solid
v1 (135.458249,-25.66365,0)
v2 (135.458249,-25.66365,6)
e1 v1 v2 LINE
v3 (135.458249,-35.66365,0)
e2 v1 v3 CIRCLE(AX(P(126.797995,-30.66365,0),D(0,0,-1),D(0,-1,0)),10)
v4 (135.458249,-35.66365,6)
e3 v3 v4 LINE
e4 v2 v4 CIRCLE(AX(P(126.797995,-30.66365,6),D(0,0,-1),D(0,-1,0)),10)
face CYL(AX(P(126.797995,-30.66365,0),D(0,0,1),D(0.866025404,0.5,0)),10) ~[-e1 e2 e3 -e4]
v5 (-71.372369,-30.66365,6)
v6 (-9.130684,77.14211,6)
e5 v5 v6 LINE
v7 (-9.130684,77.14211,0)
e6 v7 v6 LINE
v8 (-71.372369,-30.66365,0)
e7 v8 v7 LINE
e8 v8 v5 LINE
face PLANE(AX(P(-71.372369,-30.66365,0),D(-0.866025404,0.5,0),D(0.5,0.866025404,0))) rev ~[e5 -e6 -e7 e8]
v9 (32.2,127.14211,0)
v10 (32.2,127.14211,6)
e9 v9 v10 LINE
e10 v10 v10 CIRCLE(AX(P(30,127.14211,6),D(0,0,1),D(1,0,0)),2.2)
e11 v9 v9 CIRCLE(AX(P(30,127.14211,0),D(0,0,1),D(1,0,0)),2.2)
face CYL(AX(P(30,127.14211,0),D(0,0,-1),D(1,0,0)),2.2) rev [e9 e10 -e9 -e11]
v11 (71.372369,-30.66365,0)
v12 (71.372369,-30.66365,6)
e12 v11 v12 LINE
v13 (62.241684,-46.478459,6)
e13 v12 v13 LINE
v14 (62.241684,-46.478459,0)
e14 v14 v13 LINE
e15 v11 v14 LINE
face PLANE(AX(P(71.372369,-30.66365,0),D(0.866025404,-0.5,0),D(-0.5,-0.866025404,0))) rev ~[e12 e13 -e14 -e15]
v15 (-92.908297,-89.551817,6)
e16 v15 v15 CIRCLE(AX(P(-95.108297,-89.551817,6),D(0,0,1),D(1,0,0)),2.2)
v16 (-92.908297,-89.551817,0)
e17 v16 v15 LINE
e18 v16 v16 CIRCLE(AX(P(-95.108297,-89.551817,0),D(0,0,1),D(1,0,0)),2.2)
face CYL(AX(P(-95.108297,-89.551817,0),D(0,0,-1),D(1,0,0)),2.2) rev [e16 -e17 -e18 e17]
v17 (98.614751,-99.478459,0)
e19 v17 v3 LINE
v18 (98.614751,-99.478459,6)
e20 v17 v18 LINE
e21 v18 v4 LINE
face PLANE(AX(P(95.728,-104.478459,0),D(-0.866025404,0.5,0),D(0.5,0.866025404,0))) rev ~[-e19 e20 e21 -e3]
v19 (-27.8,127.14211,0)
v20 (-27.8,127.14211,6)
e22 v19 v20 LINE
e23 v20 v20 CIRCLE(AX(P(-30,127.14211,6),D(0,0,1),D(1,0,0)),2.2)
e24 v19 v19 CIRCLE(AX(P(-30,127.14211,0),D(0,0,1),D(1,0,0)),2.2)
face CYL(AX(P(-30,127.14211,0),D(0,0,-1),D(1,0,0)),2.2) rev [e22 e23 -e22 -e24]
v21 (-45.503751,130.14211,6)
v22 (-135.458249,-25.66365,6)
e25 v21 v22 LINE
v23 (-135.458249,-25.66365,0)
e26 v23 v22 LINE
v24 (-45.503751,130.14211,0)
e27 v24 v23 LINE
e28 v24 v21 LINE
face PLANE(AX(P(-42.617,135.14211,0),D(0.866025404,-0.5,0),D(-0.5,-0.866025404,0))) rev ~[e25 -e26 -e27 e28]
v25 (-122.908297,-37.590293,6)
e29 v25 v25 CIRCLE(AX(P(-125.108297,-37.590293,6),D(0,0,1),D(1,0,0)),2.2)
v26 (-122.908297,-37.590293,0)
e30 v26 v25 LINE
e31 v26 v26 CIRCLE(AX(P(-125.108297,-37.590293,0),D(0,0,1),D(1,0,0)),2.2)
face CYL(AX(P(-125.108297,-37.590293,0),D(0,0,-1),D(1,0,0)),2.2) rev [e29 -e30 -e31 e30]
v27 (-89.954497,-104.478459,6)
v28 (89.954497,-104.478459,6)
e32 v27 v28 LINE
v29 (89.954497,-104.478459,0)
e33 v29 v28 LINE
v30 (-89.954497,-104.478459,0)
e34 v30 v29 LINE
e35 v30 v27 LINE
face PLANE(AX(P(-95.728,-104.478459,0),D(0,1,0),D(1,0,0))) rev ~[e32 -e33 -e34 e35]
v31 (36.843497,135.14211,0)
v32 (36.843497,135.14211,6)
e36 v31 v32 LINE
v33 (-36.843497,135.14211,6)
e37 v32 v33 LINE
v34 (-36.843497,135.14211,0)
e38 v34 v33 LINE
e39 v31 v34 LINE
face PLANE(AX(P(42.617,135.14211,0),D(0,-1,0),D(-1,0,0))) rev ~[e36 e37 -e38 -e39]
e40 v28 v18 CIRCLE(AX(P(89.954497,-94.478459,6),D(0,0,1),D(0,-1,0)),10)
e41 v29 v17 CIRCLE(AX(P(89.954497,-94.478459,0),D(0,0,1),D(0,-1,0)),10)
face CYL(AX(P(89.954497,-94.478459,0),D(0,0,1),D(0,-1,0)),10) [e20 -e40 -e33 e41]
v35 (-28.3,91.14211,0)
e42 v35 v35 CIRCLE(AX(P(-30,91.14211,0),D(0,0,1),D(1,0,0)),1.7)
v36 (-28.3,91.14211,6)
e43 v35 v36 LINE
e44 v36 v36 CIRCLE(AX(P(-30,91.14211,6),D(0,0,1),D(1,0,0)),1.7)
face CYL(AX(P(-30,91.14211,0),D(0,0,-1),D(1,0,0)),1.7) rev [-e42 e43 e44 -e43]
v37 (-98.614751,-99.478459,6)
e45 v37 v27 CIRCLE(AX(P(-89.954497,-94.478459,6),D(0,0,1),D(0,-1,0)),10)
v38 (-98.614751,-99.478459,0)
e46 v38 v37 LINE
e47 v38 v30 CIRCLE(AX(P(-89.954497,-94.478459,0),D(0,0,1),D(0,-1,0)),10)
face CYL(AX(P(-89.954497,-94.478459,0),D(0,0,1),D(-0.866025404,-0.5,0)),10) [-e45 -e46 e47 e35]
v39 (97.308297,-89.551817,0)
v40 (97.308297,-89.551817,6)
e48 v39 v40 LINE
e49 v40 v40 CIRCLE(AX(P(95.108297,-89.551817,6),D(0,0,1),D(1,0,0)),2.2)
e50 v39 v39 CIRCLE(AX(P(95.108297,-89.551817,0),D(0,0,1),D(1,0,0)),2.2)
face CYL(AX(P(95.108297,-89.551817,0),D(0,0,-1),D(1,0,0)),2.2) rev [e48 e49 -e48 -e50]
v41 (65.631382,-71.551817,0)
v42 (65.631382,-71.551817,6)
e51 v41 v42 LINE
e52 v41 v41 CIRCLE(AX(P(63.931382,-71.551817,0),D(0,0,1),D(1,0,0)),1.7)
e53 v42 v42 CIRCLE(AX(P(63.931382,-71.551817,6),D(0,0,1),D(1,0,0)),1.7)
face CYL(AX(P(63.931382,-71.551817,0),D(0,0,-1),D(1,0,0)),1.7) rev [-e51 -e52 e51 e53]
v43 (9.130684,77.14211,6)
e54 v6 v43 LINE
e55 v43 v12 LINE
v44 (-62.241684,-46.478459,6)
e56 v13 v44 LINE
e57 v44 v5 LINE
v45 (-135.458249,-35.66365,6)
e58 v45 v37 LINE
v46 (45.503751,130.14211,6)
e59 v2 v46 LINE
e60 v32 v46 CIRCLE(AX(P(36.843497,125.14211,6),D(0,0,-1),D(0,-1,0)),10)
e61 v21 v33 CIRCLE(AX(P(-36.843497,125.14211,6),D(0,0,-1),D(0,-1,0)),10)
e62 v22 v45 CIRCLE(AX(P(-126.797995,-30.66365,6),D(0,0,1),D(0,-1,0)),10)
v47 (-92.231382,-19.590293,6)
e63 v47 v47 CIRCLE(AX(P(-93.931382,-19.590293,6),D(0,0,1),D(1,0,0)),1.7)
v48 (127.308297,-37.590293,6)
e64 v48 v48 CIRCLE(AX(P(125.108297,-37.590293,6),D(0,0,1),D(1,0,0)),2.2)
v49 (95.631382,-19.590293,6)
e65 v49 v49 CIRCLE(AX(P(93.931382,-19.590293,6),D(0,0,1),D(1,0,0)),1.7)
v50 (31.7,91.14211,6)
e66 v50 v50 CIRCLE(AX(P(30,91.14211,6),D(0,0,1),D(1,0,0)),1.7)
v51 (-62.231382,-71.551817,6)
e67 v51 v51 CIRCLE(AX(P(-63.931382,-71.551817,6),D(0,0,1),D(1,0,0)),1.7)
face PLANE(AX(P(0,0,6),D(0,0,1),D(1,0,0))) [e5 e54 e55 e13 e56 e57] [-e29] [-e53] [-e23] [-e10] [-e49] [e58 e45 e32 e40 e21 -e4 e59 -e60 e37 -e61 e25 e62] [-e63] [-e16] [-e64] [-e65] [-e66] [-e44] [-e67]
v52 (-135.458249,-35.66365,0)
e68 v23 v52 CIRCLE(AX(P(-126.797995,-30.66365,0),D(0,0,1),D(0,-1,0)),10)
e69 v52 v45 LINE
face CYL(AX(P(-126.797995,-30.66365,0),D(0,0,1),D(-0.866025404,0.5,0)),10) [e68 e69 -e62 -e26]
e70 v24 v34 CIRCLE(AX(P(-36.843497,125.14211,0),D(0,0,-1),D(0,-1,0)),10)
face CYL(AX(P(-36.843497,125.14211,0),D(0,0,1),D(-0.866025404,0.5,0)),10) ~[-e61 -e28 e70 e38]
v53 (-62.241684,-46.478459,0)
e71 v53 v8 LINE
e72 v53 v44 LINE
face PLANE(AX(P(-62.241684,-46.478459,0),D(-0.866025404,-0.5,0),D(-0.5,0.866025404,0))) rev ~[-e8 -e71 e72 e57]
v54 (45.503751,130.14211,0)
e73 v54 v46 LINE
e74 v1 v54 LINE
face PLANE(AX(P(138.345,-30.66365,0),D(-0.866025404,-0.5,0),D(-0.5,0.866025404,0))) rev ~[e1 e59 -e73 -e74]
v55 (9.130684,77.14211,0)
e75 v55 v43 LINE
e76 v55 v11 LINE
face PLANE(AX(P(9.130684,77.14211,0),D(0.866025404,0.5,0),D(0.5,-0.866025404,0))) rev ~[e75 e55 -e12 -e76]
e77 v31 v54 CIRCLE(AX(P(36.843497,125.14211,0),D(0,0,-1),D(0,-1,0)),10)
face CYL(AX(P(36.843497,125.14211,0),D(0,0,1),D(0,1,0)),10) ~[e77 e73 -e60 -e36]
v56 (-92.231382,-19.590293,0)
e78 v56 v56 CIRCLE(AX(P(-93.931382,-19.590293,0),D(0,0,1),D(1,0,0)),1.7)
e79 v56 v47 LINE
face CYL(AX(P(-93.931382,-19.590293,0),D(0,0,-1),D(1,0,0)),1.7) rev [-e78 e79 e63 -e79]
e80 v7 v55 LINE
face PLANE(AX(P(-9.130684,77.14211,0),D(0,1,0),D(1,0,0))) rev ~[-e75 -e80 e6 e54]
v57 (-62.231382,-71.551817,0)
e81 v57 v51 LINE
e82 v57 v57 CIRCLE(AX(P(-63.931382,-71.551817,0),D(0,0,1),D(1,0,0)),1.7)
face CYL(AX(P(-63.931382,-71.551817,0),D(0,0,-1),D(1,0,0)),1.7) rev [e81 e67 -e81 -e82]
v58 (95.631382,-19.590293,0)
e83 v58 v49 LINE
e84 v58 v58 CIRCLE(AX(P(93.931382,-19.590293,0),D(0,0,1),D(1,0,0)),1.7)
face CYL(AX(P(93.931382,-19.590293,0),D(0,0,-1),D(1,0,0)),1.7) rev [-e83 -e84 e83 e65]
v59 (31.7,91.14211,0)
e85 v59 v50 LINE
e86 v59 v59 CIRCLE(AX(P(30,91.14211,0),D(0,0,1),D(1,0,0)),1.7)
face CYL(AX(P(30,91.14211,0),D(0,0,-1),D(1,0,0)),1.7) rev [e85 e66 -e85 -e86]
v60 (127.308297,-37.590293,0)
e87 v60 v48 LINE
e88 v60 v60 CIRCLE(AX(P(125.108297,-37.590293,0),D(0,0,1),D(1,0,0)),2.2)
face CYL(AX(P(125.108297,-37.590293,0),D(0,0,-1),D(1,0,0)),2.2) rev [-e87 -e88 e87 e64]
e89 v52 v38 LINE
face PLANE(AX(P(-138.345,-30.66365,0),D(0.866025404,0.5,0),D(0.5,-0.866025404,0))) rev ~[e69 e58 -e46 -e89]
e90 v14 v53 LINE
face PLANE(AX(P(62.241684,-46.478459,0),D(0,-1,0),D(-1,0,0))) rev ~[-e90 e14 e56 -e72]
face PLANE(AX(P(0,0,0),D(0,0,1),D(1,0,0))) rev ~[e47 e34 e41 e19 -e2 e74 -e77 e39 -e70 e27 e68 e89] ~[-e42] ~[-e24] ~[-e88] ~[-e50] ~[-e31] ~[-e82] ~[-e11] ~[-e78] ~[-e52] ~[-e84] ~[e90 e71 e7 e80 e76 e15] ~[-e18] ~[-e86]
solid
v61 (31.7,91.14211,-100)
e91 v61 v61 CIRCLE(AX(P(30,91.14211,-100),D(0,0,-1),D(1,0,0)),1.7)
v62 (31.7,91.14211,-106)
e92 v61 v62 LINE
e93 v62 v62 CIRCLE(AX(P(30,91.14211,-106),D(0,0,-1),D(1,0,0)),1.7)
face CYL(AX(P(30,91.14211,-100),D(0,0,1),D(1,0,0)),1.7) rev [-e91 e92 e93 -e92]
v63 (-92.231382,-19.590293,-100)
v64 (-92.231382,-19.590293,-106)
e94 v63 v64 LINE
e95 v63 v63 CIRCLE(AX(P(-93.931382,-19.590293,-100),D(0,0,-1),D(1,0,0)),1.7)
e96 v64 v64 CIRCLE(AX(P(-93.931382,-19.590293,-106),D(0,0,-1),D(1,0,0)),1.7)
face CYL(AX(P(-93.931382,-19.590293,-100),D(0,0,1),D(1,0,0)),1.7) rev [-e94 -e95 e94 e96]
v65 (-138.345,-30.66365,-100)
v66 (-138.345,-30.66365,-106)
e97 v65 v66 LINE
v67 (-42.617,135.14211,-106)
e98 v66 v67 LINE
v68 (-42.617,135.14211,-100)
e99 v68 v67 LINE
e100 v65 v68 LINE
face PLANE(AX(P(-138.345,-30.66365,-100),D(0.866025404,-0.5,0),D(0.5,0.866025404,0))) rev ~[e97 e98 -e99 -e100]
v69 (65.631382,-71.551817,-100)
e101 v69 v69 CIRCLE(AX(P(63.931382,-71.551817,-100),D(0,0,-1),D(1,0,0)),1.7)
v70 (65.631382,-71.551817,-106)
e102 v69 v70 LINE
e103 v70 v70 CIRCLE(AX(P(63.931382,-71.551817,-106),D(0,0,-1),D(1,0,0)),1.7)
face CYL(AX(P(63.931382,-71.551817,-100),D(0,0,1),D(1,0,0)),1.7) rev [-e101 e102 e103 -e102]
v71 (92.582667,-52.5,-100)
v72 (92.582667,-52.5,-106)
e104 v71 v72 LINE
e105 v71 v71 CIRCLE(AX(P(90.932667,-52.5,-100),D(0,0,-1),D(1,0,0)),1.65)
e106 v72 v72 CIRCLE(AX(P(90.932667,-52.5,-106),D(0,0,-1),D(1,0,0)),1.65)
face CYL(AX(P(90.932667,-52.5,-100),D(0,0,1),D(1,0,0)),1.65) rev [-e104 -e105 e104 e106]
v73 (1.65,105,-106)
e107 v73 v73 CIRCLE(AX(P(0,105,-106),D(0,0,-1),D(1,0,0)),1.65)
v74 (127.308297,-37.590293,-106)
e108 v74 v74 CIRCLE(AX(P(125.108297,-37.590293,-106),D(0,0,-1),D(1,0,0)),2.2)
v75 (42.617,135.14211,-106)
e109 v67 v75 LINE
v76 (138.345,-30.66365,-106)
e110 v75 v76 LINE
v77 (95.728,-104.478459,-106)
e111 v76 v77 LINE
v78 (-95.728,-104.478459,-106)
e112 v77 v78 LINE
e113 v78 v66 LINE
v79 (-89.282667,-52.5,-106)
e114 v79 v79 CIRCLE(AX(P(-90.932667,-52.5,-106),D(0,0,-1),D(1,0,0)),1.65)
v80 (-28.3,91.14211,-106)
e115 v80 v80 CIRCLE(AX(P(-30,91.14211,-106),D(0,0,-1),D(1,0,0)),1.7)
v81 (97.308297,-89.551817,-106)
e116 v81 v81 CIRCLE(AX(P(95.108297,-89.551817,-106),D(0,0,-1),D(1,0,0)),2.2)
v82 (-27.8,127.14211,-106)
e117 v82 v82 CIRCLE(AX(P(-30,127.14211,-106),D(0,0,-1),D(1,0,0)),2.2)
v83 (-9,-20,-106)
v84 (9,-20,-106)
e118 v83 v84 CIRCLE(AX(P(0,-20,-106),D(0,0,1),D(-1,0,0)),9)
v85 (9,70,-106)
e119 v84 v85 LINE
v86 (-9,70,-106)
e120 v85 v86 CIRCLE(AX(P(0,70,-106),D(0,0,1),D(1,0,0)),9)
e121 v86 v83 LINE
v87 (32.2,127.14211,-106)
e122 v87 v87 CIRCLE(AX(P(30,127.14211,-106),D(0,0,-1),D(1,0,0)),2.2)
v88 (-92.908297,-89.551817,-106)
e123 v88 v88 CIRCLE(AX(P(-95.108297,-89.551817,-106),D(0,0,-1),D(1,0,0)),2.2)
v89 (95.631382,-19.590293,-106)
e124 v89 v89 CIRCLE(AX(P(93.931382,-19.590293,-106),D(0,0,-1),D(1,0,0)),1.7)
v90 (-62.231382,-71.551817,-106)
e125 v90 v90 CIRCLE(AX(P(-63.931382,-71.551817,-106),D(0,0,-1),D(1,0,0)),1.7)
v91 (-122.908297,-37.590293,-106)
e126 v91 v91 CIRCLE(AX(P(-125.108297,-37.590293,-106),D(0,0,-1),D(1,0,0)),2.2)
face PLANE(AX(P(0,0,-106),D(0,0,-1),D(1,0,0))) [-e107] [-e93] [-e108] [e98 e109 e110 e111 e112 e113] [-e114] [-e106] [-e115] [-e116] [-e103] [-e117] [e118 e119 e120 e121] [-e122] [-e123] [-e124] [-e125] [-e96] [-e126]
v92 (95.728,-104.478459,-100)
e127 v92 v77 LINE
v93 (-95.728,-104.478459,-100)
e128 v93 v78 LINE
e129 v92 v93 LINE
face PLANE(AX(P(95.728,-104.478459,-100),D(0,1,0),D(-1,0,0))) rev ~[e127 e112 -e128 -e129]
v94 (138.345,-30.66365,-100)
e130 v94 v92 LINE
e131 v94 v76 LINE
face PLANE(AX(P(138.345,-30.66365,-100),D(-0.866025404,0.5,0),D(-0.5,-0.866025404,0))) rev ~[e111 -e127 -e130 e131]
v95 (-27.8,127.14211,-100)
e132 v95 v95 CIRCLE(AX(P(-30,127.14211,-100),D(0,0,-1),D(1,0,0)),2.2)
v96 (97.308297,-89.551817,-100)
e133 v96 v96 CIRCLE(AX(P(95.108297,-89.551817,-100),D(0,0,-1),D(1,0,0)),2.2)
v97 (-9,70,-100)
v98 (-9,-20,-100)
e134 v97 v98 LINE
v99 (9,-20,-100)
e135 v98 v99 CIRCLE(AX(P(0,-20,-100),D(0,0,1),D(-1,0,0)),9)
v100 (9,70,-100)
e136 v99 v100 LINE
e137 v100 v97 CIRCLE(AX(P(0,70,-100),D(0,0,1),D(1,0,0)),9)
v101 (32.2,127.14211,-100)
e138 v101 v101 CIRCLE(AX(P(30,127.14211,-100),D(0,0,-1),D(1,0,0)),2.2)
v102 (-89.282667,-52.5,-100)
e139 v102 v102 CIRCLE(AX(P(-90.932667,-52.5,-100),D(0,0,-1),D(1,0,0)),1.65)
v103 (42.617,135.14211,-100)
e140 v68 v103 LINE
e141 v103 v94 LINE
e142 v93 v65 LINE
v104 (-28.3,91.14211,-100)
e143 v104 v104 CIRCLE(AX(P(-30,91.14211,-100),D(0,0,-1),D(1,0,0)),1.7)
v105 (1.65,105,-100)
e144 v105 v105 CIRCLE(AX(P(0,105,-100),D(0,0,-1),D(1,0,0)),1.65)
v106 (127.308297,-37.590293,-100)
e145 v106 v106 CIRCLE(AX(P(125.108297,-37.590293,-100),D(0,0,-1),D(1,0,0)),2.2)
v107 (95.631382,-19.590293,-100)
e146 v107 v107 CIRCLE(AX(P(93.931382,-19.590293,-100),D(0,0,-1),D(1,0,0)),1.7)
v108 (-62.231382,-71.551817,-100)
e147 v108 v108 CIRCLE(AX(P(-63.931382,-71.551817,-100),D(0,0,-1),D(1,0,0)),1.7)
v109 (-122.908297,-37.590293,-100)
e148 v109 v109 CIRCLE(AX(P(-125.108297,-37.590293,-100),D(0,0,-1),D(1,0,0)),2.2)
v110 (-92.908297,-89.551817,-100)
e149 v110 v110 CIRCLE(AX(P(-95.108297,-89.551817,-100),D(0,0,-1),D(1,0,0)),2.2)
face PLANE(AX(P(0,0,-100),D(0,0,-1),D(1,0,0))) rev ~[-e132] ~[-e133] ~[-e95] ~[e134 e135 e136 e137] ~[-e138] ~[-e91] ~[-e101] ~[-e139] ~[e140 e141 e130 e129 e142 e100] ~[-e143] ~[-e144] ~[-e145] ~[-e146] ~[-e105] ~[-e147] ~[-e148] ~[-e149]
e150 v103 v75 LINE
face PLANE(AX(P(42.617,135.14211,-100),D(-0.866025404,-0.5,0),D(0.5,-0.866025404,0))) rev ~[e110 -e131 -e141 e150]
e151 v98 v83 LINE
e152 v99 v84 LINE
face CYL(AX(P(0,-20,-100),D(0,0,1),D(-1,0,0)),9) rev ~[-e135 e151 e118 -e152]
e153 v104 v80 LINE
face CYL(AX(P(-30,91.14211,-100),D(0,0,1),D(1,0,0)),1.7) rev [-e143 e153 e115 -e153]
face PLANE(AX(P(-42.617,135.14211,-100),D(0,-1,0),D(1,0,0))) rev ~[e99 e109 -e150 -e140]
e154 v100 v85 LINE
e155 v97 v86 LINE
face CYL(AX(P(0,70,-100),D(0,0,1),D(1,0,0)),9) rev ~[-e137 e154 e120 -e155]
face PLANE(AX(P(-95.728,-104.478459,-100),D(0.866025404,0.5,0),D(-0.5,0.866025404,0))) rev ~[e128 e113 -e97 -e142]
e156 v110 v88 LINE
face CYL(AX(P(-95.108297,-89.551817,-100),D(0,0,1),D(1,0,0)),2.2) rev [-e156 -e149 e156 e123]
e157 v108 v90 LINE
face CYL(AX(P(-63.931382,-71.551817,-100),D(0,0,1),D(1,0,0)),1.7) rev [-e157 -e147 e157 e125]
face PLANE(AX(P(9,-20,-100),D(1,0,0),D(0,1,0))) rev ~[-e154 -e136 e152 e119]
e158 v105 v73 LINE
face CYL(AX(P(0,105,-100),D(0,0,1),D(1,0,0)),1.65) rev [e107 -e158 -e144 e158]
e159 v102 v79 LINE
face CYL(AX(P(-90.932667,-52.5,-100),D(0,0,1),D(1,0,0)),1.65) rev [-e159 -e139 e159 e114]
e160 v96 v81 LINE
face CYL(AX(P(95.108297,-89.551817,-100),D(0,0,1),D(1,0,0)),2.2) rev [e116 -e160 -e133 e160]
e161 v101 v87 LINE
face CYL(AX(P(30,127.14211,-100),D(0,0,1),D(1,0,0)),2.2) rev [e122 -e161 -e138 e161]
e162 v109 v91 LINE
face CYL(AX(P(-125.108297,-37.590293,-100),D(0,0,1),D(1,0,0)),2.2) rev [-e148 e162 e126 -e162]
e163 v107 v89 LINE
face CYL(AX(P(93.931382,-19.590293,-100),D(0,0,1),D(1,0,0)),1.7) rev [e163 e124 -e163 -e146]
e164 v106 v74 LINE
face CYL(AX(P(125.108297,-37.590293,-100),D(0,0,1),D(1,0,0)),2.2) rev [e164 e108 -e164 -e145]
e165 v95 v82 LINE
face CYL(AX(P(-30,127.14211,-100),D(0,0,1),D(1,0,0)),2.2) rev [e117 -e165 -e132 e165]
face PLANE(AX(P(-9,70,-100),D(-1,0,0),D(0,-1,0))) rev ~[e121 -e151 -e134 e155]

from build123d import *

# Parameters (mm, degrees)
F0_R     = 2.2
F0_R_2   = 1.7
F1_DEPTH = 6
F3_R     = 2.2
F3_R_2   = 1.7
F3_R_3   = 1.65
F4_DEPTH = 6
F5_R     = 10


# Not quite as in the source:
# - a feature names something its author has since deleted; it is built from what else it names


with BuildPart() as f1:
    # F0 (on Top) → F1 (new body)
    with BuildSketch(Plane.XY):
        Polygon((-42.617, 135.14210956), (-138.345, -30.6636501469), (-95.728, -104.4784594131), (95.728, -104.4784594131), (138.345, -30.6636501469), (42.617, 135.14210956), align=None)
        with Locations((-95.1082967697, -89.5518168935)):
            Circle(F0_R, mode=Mode.SUBTRACT)
        with Locations((-63.9313822335, -71.5518168935)):
            Circle(F0_R_2, mode=Mode.SUBTRACT)
        with Locations((-125.1082967697, -37.5902926665)):
            Circle(F0_R, mode=Mode.SUBTRACT)
        with Locations((-93.9313822335, -19.5902926665)):
            Circle(F0_R_2, mode=Mode.SUBTRACT)
        Polygon((71.372368774, -30.6636501469), (62.241684387, -46.4784594131), (-62.241684387, -46.4784594131), (-71.372368774, -30.6636501469), (-9.130684387, 77.14210956), (9.130684387, 77.14210956), align=None, mode=Mode.SUBTRACT)
        with Locations((63.9313822335, -71.5518168935)):
            Circle(F0_R_2, mode=Mode.SUBTRACT)
        with Locations((95.1082967697, -89.5518168935)):
            Circle(F0_R, mode=Mode.SUBTRACT)
        with Locations((93.9313822335, -19.5902926665)):
            Circle(F0_R_2, mode=Mode.SUBTRACT)
        with Locations((125.1082967697, -37.5902926665)):
            Circle(F0_R, mode=Mode.SUBTRACT)
        with Locations((-30, 91.14210956)):
            Circle(F0_R_2, mode=Mode.SUBTRACT)
        with Locations((-30, 127.14210956)):
            Circle(F0_R, mode=Mode.SUBTRACT)
        with Locations((30, 91.14210956)):
            Circle(F0_R_2, mode=Mode.SUBTRACT)
        with Locations((30, 127.14210956)):
            Circle(F0_R, mode=Mode.SUBTRACT)
    extrude(amount=F1_DEPTH)

    # F5
    f5_edges = [f1.edges().sort_by_distance(p)[0] for p in [
        (95.728, -104.478459, 3),
        (138.345, -30.66365, 3),
        (-95.728, -104.478459, 3),
        (-138.345, -30.66365, 3),
        (-42.617, 135.14211, 3),
        (42.617, 135.14211, 3),
    ]]
    fillet(f5_edges, radius=F5_R)


with BuildPart() as f4:
    # F3 (on offset) → F4 (new body)
    with BuildSketch(Plane(origin=(0, 0, -100), x_dir=(1, 0, 0), z_dir=(0, 0, -1))):
        Polygon((95.728, 104.4784594131), (-95.728, 104.4784594131), (-138.345, 30.6636501469), (-42.617, -135.14210956), (42.617, -135.14210956), (138.345, 30.6636501469), align=None)
        with Locations((-30, -127.14210956)):
            Circle(F3_R, mode=Mode.SUBTRACT)
        with Locations((-30, -91.14210956)):
            Circle(F3_R_2, mode=Mode.SUBTRACT)
        with Locations((0, -105)):
            Circle(F3_R_3, mode=Mode.SUBTRACT)
        with BuildLine():
            Line((-9, -70), (-9, 20))
            ThreePointArc((-9, 20), (0, 29), (9, 20))
            Line((9, 20), (9, -70))
            ThreePointArc((9, -70), (0, -79), (-9, -70))
        make_face(mode=Mode.SUBTRACT)
        with Locations((30, -127.14210956)):
            Circle(F3_R, mode=Mode.SUBTRACT)
        with Locations((30, -91.14210956)):
            Circle(F3_R_2, mode=Mode.SUBTRACT)
        with Locations((-125.1082967697, 37.5902926665)):
            Circle(F3_R, mode=Mode.SUBTRACT)
        with Locations((-93.9313822335, 19.5902926665)):
            Circle(F3_R_2, mode=Mode.SUBTRACT)
        with Locations((-90.9326673974, 52.5)):
            Circle(F3_R_3, mode=Mode.SUBTRACT)
        with Locations((-95.1082967697, 89.5518168935)):
            Circle(F3_R, mode=Mode.SUBTRACT)
        with Locations((-63.9313822335, 71.5518168935)):
            Circle(F3_R_2, mode=Mode.SUBTRACT)
        with Locations((93.9313822335, 19.5902926665)):
            Circle(F3_R_2, mode=Mode.SUBTRACT)
        with Locations((125.1082967697, 37.5902926665)):
            Circle(F3_R, mode=Mode.SUBTRACT)
        with Locations((63.9313822335, 71.5518168935)):
            Circle(F3_R_2, mode=Mode.SUBTRACT)
        with Locations((90.9326673974, 52.5)):
            Circle(F3_R_3, mode=Mode.SUBTRACT)
        with Locations((95.1082967697, 89.5518168935)):
            Circle(F3_R, mode=Mode.SUBTRACT)
    extrude(amount=F4_DEPTH)


solid = Compound([f1.part, f4.part])
